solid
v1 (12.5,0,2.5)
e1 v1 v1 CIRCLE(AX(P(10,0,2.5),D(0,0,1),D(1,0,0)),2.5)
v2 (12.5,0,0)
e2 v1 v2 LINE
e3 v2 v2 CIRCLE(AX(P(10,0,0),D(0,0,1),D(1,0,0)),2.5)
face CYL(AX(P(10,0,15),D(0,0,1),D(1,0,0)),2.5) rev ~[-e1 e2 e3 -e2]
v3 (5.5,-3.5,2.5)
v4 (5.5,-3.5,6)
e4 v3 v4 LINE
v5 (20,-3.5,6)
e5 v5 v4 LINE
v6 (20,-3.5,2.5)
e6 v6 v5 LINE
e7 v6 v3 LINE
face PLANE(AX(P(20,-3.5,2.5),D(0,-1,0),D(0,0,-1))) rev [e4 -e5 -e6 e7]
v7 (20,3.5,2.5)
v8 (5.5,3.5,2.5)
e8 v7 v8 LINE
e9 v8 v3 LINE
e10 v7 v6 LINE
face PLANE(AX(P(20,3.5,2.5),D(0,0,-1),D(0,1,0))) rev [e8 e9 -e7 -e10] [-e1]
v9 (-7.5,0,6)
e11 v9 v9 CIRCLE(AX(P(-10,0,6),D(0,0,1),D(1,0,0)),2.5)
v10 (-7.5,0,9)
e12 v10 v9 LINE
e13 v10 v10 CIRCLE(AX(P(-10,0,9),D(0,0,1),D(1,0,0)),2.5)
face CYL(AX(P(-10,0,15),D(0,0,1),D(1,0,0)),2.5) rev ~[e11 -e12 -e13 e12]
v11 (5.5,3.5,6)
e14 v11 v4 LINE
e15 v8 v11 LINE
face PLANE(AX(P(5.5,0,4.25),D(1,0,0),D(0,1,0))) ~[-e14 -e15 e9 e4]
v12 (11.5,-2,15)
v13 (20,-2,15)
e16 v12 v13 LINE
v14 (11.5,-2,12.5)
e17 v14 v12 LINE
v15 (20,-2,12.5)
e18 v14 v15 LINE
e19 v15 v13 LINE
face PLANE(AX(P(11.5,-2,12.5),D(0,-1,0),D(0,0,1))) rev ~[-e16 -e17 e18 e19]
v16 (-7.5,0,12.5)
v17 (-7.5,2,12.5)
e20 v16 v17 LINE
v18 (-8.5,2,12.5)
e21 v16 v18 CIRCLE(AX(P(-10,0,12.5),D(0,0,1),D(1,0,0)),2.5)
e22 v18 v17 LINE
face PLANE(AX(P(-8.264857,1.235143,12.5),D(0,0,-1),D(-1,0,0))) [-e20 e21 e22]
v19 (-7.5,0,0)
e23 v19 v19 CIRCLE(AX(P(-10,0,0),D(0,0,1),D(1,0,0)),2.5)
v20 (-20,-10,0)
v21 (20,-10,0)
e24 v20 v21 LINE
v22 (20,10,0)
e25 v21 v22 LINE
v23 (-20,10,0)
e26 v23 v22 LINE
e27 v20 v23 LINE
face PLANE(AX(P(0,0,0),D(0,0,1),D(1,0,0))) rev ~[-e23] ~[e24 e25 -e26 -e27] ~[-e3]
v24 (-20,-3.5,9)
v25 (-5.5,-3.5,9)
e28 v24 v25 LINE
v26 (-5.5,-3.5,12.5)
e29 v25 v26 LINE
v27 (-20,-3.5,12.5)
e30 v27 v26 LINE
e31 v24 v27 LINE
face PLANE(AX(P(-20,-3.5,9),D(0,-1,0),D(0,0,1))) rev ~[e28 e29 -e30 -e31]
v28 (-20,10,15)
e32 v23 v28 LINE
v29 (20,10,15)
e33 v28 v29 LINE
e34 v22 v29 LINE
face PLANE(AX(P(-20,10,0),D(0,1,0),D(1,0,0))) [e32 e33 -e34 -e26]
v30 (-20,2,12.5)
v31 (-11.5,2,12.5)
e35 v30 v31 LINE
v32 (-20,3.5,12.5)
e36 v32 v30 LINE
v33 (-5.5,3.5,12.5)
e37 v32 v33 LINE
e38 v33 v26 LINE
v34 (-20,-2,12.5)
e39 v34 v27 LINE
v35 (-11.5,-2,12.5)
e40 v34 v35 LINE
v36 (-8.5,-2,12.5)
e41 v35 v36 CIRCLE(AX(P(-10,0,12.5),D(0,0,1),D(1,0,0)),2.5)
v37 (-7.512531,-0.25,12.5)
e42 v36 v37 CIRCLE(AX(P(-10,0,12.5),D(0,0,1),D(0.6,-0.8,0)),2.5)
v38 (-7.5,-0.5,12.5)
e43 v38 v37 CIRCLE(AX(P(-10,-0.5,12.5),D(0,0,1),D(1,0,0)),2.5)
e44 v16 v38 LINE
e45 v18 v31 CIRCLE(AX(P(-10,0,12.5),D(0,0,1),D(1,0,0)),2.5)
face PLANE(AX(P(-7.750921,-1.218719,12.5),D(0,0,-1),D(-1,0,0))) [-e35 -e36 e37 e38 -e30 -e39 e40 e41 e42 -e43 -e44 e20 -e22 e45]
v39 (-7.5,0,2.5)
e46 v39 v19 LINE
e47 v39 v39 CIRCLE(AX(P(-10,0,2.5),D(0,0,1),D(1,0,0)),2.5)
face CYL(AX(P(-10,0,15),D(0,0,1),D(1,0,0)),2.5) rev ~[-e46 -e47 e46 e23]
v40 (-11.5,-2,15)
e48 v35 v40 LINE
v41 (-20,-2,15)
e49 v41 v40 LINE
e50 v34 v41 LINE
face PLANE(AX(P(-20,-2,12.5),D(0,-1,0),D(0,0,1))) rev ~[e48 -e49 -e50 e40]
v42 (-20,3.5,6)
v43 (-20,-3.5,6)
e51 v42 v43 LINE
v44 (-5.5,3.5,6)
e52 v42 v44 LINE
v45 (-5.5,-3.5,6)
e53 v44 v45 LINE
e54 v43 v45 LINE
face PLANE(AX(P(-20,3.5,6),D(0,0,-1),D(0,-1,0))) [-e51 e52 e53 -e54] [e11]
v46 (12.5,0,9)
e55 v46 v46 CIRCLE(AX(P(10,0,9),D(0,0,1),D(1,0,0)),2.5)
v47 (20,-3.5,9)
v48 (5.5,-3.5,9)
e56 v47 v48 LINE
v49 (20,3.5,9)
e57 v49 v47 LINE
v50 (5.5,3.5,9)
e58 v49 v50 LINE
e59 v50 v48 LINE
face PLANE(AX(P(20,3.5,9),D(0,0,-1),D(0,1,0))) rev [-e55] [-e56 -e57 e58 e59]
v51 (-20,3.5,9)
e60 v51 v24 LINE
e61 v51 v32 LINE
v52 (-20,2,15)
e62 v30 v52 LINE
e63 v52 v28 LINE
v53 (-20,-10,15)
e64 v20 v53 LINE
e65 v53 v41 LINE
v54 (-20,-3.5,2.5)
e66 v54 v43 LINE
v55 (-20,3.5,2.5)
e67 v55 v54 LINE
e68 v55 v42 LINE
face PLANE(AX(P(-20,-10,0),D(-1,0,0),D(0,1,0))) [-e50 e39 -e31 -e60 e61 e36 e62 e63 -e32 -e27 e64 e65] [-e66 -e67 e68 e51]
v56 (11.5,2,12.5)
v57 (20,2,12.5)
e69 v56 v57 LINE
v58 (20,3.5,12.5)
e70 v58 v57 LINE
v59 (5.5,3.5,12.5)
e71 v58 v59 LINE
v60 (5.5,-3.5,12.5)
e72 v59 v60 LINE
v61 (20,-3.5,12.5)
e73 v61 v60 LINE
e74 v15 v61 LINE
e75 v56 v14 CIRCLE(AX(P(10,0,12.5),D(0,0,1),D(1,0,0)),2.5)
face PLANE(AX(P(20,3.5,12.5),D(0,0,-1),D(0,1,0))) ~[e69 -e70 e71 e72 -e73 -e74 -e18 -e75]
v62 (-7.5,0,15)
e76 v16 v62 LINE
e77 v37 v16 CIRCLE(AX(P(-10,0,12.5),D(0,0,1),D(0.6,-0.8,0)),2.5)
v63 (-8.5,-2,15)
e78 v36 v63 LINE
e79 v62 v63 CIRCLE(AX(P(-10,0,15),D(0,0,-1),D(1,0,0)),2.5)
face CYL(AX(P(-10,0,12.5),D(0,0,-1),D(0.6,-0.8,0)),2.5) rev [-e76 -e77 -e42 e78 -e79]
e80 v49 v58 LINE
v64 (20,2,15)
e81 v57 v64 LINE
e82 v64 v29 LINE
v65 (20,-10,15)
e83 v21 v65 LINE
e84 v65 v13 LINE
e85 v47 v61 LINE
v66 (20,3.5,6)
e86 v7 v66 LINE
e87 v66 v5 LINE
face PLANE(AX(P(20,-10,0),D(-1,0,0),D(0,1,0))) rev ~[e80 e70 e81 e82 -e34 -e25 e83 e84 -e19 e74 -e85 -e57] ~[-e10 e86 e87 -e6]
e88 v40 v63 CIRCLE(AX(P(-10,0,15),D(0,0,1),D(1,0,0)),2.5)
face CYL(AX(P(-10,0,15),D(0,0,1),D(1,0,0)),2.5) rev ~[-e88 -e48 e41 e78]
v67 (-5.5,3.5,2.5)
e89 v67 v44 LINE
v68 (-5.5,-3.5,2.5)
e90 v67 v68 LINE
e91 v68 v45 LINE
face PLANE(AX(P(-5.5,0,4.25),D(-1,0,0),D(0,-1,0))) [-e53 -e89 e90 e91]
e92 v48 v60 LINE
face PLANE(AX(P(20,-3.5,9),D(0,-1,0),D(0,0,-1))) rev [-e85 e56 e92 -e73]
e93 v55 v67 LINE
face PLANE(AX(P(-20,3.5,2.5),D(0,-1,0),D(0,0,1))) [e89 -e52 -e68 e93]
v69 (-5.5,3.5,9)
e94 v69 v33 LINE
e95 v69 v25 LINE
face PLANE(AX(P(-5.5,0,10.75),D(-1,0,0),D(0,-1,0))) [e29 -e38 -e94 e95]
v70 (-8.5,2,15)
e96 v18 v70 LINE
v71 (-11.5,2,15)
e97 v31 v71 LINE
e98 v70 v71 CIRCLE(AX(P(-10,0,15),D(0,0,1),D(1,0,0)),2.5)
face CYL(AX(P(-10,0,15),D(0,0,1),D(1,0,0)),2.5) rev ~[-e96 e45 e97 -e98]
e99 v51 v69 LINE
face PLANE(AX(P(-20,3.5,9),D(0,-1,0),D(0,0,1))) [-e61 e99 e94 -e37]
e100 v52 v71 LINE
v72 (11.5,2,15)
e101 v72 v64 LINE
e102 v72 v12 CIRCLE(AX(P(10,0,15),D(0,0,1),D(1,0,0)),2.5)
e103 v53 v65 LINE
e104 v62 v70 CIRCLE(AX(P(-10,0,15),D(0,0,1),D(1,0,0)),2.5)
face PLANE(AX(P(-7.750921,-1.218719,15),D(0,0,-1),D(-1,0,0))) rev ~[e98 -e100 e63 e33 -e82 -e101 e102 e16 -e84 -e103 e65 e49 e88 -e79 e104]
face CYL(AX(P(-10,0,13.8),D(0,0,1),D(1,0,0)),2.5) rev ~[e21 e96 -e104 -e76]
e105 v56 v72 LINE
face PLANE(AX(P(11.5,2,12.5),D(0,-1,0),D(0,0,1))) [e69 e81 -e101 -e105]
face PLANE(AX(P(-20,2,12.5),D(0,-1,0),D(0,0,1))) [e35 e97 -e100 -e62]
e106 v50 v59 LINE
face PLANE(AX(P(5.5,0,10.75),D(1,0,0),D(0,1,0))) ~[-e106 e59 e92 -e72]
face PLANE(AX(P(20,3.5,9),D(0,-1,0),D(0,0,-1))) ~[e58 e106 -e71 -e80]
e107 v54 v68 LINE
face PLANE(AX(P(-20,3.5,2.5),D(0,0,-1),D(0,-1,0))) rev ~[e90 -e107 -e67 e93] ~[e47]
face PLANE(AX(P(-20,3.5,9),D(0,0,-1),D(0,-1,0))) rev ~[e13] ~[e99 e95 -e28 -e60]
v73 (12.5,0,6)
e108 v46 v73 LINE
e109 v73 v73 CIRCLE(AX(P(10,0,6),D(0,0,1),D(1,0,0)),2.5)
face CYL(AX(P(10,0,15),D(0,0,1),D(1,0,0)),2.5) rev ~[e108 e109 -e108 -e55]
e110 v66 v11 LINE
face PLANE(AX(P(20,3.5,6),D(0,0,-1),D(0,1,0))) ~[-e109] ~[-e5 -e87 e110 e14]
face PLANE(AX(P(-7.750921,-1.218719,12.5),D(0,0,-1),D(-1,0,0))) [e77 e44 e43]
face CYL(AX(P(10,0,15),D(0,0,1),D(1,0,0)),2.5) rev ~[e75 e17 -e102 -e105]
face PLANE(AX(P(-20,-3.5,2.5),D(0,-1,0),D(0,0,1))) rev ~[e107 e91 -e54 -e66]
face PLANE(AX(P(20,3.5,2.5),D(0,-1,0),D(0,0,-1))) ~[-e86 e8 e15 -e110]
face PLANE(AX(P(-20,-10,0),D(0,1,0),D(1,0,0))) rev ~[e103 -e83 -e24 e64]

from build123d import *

# Parameters (mm, degrees)
F0_W            = 40
F0_H            = 20
F1_DEPTH        = 15
F2_R            = 2.5
F3_DEPTH        = 15.001
F4_W            = 7
F4_H            = 3.5
F5_DEPTH        = 14.5
F6_W            = 4
F6_H            = 2.5
F7_DEPTH        = 12.5
F7_COPIES_COUNT = 2
F7_COPIES_PITCH = 31.5
F8_T1_DEPTH     = 2.5
F9_T4_DEPTH     = 2.5
F9_S5_R         = 2.5
F9_T6_DEPTH     = 4


# Not quite as in the source:
# - a fillet or chamfer that OpenCascade refuses, or shapes differently, is made with other operations: its cross-section is extruded or revolved along the edge and cut away or added
# - a pattern or mirror of a feature is missing from the dataset's text; its kind, count and spacing are read off the source's solid


with BuildPart() as f1:
    # F0 (on Top) → F1 (new body)
    with BuildSketch(Plane.XY):
        Rectangle(F0_W, F0_H)
    extrude(amount=F1_DEPTH)

    # F2 (on face) → F3 (cut, through all)
    with BuildSketch(Plane.XY.offset(15)):
        with Locations((-10, 0)):
            Circle(F2_R)
        with Locations((10, 0)):
            Circle(F2_R)
    extrude(amount=-F3_DEPTH, mode=Mode.SUBTRACT)

    # F4 (on face) → F5 (cut)
    with BuildSketch(Plane(origin=(-20, 0, 0), x_dir=(0, -1, 0), z_dir=(-1, 0, 0))):
        with Locations((0, 4.25)):
            Rectangle(F4_W, F4_H)
        with Locations((0, 10.75)):
            Rectangle(F4_W, F4_H)
    f5 = extrude(amount=-F5_DEPTH, mode=Mode.SUBTRACT)

    # F5_copies: F5 across plane
    add(f5.mirror(Plane(origin=(0, 0, 0), x_dir=(0, 0, 1), z_dir=(1, 0, 0))), mode=Mode.SUBTRACT)

    # F6 (on face) → F7 (cut)
    with BuildSketch(Plane(origin=(-20, 0, 0), x_dir=(0, -1, 0), z_dir=(-1, 0, 0))):
        with Locations((0, 13.75)):
            Rectangle(F6_W, F6_H)
    f7 = extrude(amount=-F7_DEPTH, mode=Mode.SUBTRACT)

    # F7_copies: F7 ×2
    with Locations(*[(i * F7_COPIES_PITCH, 0, 0) for i in range(1, F7_COPIES_COUNT)]):
        add(f7, mode=Mode.SUBTRACT)

    # F8: fillet of radius 2.5 on 1 edges, made by hand

    # F8_s2 → F8_t1 (join)
    with BuildSketch(Plane.XY.offset(12.5)):
        with BuildLine():
            ThreePointArc((-8.5, -2), (-7.7639320225, -1.1180339887), (-7.5, 0))
            Line((-7.5, 0), (-7.5, -2))
            Line((-7.5, -2), (-8.5, -2))
        make_face()
    extrude(amount=F8_T1_DEPTH)

    # F9: fillet of radius 2.5 on 1 edges, made by hand


with BuildPart() as f9_tool2:
    # F9_s3 → F9_t4 (new body)
    with BuildSketch(Plane.XY.offset(15)):
        with BuildLine():
            ThreePointArc((-7.5, -0.5), (-8.232233047, 1.267766953), (-10, 2))
            Line((-10, 2), (-7.5, 2))
            Line((-7.5, 2), (-7.5, -0.5))
        make_face()
    extrude(amount=-F9_T4_DEPTH)

    # F9_s5 → F9_t6 (cut, symmetric)
    with BuildSketch(Plane.XY.offset(13.8)):
        with Locations((-10, 0)):
            Circle(F9_S5_R)
    extrude(amount=F9_T6_DEPTH, both=True, mode=Mode.SUBTRACT)


with BuildPart() as f1_1:
    add(f1.part)

    # F9_t1: union F9_tool2
    add(f9_tool2.part)


solid = f1_1.part
